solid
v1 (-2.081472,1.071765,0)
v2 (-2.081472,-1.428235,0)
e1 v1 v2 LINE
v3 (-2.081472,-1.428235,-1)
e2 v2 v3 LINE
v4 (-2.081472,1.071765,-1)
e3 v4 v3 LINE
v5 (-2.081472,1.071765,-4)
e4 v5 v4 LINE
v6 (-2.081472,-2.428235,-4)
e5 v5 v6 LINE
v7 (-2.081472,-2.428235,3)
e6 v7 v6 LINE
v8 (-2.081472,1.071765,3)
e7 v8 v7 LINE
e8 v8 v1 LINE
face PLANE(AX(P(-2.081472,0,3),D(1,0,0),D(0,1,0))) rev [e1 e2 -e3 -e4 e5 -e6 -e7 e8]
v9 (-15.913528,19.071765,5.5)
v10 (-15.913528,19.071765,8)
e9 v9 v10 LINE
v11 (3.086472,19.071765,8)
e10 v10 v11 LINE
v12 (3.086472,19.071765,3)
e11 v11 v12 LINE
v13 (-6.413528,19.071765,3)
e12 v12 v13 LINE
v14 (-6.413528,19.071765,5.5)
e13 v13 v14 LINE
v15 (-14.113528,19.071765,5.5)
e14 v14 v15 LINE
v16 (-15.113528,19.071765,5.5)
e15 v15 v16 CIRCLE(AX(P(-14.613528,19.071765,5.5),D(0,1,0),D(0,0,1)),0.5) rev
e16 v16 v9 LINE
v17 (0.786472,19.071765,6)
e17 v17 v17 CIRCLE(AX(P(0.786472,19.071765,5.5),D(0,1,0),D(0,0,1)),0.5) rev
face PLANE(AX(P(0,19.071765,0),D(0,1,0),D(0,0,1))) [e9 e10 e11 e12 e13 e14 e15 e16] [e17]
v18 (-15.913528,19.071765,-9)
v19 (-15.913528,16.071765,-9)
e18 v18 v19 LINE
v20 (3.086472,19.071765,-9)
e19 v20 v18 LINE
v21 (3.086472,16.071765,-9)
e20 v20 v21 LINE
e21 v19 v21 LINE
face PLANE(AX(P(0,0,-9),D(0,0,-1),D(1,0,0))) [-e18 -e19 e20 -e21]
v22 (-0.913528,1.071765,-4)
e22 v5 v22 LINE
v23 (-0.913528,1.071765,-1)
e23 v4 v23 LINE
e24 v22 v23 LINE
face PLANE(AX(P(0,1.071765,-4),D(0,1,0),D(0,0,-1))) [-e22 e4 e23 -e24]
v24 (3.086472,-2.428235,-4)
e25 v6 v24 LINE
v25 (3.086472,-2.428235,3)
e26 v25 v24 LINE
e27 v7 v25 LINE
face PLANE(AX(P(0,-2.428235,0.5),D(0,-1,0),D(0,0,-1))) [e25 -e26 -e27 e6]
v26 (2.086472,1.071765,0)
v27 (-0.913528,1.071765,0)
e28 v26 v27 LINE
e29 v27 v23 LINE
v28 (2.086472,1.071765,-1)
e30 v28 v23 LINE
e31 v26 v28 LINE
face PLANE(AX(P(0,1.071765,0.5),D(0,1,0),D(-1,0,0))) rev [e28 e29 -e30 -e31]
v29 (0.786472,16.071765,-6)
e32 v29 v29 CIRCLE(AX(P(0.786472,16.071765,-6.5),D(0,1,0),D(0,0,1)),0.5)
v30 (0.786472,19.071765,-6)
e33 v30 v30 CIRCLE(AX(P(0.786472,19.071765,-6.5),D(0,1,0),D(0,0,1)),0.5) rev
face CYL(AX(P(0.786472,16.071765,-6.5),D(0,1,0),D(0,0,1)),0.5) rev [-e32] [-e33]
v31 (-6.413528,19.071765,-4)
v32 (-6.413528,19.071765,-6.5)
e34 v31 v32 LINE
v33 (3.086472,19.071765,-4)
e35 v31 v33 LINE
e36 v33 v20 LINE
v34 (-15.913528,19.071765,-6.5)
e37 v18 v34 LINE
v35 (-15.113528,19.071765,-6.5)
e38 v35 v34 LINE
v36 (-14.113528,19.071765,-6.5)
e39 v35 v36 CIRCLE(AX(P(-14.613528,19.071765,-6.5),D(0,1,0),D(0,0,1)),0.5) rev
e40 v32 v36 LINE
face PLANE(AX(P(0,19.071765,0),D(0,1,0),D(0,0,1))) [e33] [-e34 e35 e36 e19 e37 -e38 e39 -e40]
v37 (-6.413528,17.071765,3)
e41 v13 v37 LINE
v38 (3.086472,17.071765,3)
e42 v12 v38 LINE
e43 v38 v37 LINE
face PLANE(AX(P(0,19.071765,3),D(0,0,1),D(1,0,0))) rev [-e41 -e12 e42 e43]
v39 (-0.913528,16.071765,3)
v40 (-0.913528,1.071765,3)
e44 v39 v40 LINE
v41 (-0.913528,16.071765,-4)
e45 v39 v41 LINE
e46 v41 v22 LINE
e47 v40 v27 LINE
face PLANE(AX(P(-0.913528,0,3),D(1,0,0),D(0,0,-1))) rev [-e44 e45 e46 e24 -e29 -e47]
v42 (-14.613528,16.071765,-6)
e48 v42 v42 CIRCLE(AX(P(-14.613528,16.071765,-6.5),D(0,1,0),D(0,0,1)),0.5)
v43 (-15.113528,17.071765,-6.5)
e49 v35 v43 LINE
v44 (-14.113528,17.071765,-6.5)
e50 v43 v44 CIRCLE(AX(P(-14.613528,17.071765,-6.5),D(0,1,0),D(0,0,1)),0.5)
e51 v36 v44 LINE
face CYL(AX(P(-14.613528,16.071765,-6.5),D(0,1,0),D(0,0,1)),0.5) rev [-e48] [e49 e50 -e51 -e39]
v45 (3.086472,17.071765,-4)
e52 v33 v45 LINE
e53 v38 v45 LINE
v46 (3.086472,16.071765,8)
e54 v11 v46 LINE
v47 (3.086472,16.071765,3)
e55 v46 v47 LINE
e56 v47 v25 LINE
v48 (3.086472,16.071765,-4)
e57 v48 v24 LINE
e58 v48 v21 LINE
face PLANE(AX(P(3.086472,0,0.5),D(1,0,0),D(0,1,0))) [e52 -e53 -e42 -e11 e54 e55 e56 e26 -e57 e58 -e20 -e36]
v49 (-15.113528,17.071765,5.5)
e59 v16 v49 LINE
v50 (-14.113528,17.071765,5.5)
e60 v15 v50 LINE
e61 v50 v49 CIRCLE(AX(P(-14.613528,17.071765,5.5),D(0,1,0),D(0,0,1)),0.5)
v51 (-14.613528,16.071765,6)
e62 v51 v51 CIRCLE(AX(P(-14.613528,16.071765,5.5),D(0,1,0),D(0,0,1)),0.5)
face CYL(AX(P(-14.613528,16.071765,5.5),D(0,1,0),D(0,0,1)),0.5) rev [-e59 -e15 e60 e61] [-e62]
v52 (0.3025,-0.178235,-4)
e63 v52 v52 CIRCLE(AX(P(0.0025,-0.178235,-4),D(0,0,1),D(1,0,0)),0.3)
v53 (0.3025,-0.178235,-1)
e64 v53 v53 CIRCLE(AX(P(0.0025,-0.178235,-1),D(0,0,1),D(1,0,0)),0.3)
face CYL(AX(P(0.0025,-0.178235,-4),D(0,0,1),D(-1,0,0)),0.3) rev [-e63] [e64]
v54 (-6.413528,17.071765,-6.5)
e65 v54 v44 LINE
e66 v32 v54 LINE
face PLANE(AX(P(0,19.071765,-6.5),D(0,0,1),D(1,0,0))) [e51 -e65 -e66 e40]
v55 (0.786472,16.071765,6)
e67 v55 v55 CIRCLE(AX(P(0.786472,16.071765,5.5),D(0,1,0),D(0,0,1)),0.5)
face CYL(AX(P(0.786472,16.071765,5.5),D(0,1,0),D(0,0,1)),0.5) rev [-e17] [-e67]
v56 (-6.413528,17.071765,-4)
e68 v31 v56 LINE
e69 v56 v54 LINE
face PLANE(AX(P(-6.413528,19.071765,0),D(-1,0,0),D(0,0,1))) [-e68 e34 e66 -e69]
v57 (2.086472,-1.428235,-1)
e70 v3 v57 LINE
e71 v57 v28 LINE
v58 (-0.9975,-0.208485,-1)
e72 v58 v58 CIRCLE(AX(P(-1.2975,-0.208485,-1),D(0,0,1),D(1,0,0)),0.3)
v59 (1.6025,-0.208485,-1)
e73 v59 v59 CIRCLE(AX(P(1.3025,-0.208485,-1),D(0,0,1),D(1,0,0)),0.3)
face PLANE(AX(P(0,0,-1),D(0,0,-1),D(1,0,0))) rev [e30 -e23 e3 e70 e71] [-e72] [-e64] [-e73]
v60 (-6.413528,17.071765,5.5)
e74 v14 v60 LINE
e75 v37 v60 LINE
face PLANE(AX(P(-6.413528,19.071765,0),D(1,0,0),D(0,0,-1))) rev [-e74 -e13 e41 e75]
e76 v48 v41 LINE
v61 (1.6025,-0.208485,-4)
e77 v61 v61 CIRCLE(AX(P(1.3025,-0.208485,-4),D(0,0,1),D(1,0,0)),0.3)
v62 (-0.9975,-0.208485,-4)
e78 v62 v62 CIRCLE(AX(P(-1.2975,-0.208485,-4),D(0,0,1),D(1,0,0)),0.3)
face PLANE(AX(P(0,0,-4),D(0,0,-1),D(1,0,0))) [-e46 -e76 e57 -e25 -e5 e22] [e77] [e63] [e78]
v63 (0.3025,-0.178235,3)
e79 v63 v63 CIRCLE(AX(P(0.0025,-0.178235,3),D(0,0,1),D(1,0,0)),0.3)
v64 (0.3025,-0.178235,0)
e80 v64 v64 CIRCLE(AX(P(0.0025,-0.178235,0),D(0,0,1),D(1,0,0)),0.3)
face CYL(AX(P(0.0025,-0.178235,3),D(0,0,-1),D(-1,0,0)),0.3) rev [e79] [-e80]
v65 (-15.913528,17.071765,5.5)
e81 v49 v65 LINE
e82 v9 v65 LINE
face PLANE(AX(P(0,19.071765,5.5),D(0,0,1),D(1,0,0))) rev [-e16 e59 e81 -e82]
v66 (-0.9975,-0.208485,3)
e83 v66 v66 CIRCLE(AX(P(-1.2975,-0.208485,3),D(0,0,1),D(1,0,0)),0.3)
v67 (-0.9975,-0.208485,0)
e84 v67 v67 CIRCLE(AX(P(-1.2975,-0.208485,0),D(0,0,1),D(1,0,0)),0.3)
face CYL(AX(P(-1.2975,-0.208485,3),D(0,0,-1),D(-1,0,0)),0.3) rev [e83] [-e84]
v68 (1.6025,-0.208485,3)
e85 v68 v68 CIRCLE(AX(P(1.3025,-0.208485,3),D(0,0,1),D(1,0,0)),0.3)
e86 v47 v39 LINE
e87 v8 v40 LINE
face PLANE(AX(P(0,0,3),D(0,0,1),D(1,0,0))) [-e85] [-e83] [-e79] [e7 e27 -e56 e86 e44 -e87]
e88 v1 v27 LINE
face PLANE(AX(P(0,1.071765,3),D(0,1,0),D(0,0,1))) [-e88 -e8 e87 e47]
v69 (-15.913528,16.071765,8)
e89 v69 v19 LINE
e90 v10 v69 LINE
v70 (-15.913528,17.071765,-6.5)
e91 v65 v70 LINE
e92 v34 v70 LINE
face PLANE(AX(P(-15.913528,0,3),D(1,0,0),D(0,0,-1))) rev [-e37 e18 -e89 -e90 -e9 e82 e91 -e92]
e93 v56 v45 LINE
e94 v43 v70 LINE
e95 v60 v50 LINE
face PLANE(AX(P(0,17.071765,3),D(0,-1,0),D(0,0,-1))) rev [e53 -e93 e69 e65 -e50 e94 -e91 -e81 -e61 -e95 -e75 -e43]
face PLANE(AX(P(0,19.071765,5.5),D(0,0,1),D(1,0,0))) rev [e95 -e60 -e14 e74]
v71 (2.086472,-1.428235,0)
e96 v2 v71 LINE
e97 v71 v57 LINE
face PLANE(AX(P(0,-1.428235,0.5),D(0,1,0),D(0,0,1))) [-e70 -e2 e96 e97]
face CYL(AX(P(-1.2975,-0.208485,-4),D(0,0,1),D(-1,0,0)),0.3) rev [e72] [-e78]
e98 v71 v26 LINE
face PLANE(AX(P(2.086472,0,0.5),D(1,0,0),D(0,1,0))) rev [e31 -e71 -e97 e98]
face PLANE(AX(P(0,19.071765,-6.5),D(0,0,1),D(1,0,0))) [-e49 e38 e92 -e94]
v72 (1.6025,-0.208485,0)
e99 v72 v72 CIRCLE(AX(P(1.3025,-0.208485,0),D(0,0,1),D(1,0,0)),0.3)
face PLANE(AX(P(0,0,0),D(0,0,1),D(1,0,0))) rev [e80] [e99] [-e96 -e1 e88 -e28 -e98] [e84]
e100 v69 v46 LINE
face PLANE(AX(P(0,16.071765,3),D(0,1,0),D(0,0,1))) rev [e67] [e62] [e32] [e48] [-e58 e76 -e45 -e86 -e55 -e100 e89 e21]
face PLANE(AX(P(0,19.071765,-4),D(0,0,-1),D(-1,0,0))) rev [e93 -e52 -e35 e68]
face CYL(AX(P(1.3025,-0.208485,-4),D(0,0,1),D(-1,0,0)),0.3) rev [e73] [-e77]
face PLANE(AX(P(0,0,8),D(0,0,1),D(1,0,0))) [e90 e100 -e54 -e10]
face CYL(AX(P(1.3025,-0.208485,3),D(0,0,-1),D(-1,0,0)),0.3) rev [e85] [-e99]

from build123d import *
from build123d.topology import SkipClean

# Parameters (mm, degrees)
SKETCH3_W                = 4.167944103
SKETCH3_H                = 2.5
SKETCH3_R                = 0.3
BOSS_EXTRUDE1_DEPTH      = 3
SKETCH6_W                = 3
SKETCH6_H                = 15
BOSS_EXTRUDE3_DEPTH      = 3
BOSS_EXTRUDE4_DEPTH      = 8
SKETCH7_R                = 0.5
CUT_EXTRUDE1_DEPTH       = 1
BOSS_EXTRUDE5_DEPTH      = 1
BOSS_EXTRUDE5_DEPTH_BACK = 1
BOSS_EXTRUDE6_DEPTH      = 3.5
BOSS_EXTRUDE6_DEPTH_BACK = 3.5
SKETCH8_5_W              = 4.167944103
SKETCH8_5_H              = 1
BOSS_EXTRUDE7_DEPTH      = 3.5
BOSS_EXTRUDE7_DEPTH_BACK = 3.5
BOSS_EXTRUDE8_START      = 2
SKETCH9_R                = 0.5
BOSS_EXTRUDE8_DEPTH      = 2
BOSS_EXTRUDE9_DEPTH      = 8.5
BOSS_EXTRUDE9_DEPTH_BACK = 8.5
SKETCH8_7_W              = 1
SKETCH8_7_H              = 1


with BuildPart() as part:
    # Sketch3 → Boss-Extrude1 (new body)
    with BuildSketch(Plane.XY):
        with Locations((0.002500359, -0.178234892)):
            Rectangle(SKETCH3_W, SKETCH3_H)
        with Locations((-1.297499642, -0.208485146)):
            Circle(SKETCH3_R, mode=Mode.SUBTRACT)
        with Locations((1.302500358, -0.208485146)):
            Circle(SKETCH3_R, mode=Mode.SUBTRACT)
        with Locations((0.002500358, -0.178234892)):
            Circle(SKETCH3_R, mode=Mode.SUBTRACT)
    extrude(amount=BOSS_EXTRUDE1_DEPTH)

    # Sketch6 → Boss-Extrude3 (add)
    with BuildSketch(Plane.XY):
        with Locations((0.58647241, 8.571765108)):
            Rectangle(SKETCH6_W, SKETCH6_H)
        Polygon((-0.91352759, 16.071765108), (2.08647241, 16.071765108), (2.08647241, 17.071765108), (-15.91352759, 17.071765108), (-15.91352759, 16.071765108), align=None)
    extrude(amount=BOSS_EXTRUDE3_DEPTH)

    # Sketch6<5> → Boss-Extrude4 (add)
    with BuildSketch(Plane.XY):
        Polygon((-0.91352759, 16.071765108), (2.08647241, 16.071765108), (2.08647241, 17.071765108), (-15.91352759, 17.071765108), (-15.91352759, 16.071765108), align=None)
    extrude(amount=BOSS_EXTRUDE4_DEPTH)


with BuildPart() as body_2:
    # Mirror4: mirrored copy
    add(part.part.mirror(Plane(origin=(0, 0, -0.5), x_dir=(1, 0, 0), z_dir=(0, 0, -1))))


with BuildPart() as cut_extrude1_tool:
    # Sketch7 → Cut-Extrude1 (new body)
    with BuildSketch(Plane(origin=(0, 17.071765108, 0), x_dir=(1, 0, 0), z_dir=(0, 1, 0))):
        with Locations((-14.61352759, -5.5)):
            Circle(SKETCH7_R)
        with Locations((-14.61352759, 6.5)):
            Circle(SKETCH7_R)
        with Locations((0.78647241, -5.5)):
            Circle(SKETCH7_R)
        with Locations((0.78647241, 6.5)):
            Circle(SKETCH7_R)
    extrude(amount=-CUT_EXTRUDE1_DEPTH)


with BuildPart() as part_1:
    add(part.part)

    # Cut-Extrude1: cut by cut_extrude1_tool
    add(cut_extrude1_tool.part, mode=Mode.SUBTRACT)



with BuildPart() as body_2_1:
    add(body_2.part)

    # Cut-Extrude1: cut by cut_extrude1_tool
    add(cut_extrude1_tool.part, mode=Mode.SUBTRACT)


with BuildPart() as part_2:
    add(part_1.part)

    add(body_2_1.part)  # Boss-Extrude5 merges body 2
    # Sketch8 → Boss-Extrude5 (add, two sides: drawn at the far end of the back side and taken through both)
    with BuildSketch(Plane(origin=(0, 0, -0.5), x_dir=(-1, 0, 0), z_dir=(0, 0, -1)).offset(-BOSS_EXTRUDE5_DEPTH_BACK)):
        Polygon((2.081471693, -2.428234892), (2.081471693, -1.428234892), (-2.08647241, -1.428234892), (-2.08647241, 1.071765108), (0.91352759, 1.071765108), (0.91352759, 16.071765108), (15.91352759, 16.071765108), (15.91352759, 17.071765108), (-3.08647241, 17.071765108), (-3.08647241, -2.428234892), align=None)
    extrude(amount=BOSS_EXTRUDE5_DEPTH + BOSS_EXTRUDE5_DEPTH_BACK)

    # Sketch8<5> → Boss-Extrude6 (add, two sides: drawn at the far end of the back side and taken through both)
    with BuildSketch(Plane(origin=(0, 0, -0.5), x_dir=(-1, 0, 0), z_dir=(0, 0, -1)).offset(-BOSS_EXTRUDE6_DEPTH_BACK)):
        with Locations((-0.002500359, -1.928234892)):
            Rectangle(SKETCH8_5_W, SKETCH8_5_H)
    extrude(amount=BOSS_EXTRUDE6_DEPTH + BOSS_EXTRUDE6_DEPTH_BACK)

    # Sketch8<6> → Boss-Extrude7 (add, two sides: drawn at the far end of the back side and taken through both)
    with BuildSketch(Plane(origin=(0, 0, -0.5), x_dir=(-1, 0, 0), z_dir=(0, 0, -1)).offset(-BOSS_EXTRUDE7_DEPTH_BACK)):
        Polygon((-2.08647241, -2.428234892), (-2.08647241, -1.428234892), (-2.08647241, 1.071765108), (-2.08647241, 16.071765108), (-3.08647241, 16.071765108), (-3.08647241, -2.428234892), align=None)
    extrude(amount=BOSS_EXTRUDE7_DEPTH + BOSS_EXTRUDE7_DEPTH_BACK)

    # Sketch9 → Boss-Extrude8 (add)
    # profile 1 of 2: a face of its own
    with SkipClean():  # the faces are left unmerged after this step: merging them gives an invalid solid
        with BuildSketch(Plane(origin=(0, 17.071765108, 0), x_dir=(1, 0, 0), z_dir=(0, 1, 0)).offset(BOSS_EXTRUDE8_START)):
            with BuildLine():
                Line((-15.11352759, -5.5), (-15.91352759, -5.5))
                Line((-15.91352759, -5.5), (-15.91352759, -8))
                Line((-15.91352759, -8), (3.08647241, -8))
                Line((3.08647241, -8), (3.08647241, -3))
                Line((3.08647241, -3), (-6.41352759, -3))
                Line((-6.41352759, -3), (-6.41352759, -5.5))
                Line((-6.41352759, -5.5), (-14.11352759, -5.5))
                ThreePointArc((-14.11352759, -5.5), (-14.61352759, -6), (-15.11352759, -5.5))
            make_face()
            with Locations((0.78647241, -5.5)):
                Circle(SKETCH9_R, mode=Mode.SUBTRACT)
        # profile 2 of 2: a face of its own
        with BuildSketch(Plane(origin=(0, 17.071765108, 0), x_dir=(1, 0, 0), z_dir=(0, 1, 0)).offset(BOSS_EXTRUDE8_START)):
            with BuildLine():
                Line((-6.41352759, 6.5), (-6.41352759, 4))
                Line((-6.41352759, 4), (3.08647241, 4))
                Line((3.08647241, 4), (3.08647241, 9))
                Line((3.08647241, 9), (-15.91352759, 9))
                Line((-15.91352759, 9), (-15.91352759, 6.5))
                Line((-15.91352759, 6.5), (-15.11352759, 6.5))
                ThreePointArc((-15.11352759, 6.5), (-14.61352759, 7), (-14.11352759, 6.5))
                Line((-14.11352759, 6.5), (-6.41352759, 6.5))
            make_face()
            with Locations((0.78647241, 6.5)):
                Circle(SKETCH9_R, mode=Mode.SUBTRACT)
        extrude(amount=-BOSS_EXTRUDE8_DEPTH)

    # Sketch8<7> → Boss-Extrude9 (add, two sides: drawn at the far end of the back side and taken through both)
    with SkipClean():  # the faces are left unmerged after this step: merging them gives an invalid solid
        with BuildSketch(Plane(origin=(0, 0, -0.5), x_dir=(-1, 0, 0), z_dir=(0, 0, -1)).offset(-BOSS_EXTRUDE9_DEPTH_BACK)):
            with Locations((-2.58647241, 16.571765108)):
                Rectangle(SKETCH8_7_W, SKETCH8_7_H)
        extrude(amount=BOSS_EXTRUDE9_DEPTH + BOSS_EXTRUDE9_DEPTH_BACK)


solid = part_2.part
